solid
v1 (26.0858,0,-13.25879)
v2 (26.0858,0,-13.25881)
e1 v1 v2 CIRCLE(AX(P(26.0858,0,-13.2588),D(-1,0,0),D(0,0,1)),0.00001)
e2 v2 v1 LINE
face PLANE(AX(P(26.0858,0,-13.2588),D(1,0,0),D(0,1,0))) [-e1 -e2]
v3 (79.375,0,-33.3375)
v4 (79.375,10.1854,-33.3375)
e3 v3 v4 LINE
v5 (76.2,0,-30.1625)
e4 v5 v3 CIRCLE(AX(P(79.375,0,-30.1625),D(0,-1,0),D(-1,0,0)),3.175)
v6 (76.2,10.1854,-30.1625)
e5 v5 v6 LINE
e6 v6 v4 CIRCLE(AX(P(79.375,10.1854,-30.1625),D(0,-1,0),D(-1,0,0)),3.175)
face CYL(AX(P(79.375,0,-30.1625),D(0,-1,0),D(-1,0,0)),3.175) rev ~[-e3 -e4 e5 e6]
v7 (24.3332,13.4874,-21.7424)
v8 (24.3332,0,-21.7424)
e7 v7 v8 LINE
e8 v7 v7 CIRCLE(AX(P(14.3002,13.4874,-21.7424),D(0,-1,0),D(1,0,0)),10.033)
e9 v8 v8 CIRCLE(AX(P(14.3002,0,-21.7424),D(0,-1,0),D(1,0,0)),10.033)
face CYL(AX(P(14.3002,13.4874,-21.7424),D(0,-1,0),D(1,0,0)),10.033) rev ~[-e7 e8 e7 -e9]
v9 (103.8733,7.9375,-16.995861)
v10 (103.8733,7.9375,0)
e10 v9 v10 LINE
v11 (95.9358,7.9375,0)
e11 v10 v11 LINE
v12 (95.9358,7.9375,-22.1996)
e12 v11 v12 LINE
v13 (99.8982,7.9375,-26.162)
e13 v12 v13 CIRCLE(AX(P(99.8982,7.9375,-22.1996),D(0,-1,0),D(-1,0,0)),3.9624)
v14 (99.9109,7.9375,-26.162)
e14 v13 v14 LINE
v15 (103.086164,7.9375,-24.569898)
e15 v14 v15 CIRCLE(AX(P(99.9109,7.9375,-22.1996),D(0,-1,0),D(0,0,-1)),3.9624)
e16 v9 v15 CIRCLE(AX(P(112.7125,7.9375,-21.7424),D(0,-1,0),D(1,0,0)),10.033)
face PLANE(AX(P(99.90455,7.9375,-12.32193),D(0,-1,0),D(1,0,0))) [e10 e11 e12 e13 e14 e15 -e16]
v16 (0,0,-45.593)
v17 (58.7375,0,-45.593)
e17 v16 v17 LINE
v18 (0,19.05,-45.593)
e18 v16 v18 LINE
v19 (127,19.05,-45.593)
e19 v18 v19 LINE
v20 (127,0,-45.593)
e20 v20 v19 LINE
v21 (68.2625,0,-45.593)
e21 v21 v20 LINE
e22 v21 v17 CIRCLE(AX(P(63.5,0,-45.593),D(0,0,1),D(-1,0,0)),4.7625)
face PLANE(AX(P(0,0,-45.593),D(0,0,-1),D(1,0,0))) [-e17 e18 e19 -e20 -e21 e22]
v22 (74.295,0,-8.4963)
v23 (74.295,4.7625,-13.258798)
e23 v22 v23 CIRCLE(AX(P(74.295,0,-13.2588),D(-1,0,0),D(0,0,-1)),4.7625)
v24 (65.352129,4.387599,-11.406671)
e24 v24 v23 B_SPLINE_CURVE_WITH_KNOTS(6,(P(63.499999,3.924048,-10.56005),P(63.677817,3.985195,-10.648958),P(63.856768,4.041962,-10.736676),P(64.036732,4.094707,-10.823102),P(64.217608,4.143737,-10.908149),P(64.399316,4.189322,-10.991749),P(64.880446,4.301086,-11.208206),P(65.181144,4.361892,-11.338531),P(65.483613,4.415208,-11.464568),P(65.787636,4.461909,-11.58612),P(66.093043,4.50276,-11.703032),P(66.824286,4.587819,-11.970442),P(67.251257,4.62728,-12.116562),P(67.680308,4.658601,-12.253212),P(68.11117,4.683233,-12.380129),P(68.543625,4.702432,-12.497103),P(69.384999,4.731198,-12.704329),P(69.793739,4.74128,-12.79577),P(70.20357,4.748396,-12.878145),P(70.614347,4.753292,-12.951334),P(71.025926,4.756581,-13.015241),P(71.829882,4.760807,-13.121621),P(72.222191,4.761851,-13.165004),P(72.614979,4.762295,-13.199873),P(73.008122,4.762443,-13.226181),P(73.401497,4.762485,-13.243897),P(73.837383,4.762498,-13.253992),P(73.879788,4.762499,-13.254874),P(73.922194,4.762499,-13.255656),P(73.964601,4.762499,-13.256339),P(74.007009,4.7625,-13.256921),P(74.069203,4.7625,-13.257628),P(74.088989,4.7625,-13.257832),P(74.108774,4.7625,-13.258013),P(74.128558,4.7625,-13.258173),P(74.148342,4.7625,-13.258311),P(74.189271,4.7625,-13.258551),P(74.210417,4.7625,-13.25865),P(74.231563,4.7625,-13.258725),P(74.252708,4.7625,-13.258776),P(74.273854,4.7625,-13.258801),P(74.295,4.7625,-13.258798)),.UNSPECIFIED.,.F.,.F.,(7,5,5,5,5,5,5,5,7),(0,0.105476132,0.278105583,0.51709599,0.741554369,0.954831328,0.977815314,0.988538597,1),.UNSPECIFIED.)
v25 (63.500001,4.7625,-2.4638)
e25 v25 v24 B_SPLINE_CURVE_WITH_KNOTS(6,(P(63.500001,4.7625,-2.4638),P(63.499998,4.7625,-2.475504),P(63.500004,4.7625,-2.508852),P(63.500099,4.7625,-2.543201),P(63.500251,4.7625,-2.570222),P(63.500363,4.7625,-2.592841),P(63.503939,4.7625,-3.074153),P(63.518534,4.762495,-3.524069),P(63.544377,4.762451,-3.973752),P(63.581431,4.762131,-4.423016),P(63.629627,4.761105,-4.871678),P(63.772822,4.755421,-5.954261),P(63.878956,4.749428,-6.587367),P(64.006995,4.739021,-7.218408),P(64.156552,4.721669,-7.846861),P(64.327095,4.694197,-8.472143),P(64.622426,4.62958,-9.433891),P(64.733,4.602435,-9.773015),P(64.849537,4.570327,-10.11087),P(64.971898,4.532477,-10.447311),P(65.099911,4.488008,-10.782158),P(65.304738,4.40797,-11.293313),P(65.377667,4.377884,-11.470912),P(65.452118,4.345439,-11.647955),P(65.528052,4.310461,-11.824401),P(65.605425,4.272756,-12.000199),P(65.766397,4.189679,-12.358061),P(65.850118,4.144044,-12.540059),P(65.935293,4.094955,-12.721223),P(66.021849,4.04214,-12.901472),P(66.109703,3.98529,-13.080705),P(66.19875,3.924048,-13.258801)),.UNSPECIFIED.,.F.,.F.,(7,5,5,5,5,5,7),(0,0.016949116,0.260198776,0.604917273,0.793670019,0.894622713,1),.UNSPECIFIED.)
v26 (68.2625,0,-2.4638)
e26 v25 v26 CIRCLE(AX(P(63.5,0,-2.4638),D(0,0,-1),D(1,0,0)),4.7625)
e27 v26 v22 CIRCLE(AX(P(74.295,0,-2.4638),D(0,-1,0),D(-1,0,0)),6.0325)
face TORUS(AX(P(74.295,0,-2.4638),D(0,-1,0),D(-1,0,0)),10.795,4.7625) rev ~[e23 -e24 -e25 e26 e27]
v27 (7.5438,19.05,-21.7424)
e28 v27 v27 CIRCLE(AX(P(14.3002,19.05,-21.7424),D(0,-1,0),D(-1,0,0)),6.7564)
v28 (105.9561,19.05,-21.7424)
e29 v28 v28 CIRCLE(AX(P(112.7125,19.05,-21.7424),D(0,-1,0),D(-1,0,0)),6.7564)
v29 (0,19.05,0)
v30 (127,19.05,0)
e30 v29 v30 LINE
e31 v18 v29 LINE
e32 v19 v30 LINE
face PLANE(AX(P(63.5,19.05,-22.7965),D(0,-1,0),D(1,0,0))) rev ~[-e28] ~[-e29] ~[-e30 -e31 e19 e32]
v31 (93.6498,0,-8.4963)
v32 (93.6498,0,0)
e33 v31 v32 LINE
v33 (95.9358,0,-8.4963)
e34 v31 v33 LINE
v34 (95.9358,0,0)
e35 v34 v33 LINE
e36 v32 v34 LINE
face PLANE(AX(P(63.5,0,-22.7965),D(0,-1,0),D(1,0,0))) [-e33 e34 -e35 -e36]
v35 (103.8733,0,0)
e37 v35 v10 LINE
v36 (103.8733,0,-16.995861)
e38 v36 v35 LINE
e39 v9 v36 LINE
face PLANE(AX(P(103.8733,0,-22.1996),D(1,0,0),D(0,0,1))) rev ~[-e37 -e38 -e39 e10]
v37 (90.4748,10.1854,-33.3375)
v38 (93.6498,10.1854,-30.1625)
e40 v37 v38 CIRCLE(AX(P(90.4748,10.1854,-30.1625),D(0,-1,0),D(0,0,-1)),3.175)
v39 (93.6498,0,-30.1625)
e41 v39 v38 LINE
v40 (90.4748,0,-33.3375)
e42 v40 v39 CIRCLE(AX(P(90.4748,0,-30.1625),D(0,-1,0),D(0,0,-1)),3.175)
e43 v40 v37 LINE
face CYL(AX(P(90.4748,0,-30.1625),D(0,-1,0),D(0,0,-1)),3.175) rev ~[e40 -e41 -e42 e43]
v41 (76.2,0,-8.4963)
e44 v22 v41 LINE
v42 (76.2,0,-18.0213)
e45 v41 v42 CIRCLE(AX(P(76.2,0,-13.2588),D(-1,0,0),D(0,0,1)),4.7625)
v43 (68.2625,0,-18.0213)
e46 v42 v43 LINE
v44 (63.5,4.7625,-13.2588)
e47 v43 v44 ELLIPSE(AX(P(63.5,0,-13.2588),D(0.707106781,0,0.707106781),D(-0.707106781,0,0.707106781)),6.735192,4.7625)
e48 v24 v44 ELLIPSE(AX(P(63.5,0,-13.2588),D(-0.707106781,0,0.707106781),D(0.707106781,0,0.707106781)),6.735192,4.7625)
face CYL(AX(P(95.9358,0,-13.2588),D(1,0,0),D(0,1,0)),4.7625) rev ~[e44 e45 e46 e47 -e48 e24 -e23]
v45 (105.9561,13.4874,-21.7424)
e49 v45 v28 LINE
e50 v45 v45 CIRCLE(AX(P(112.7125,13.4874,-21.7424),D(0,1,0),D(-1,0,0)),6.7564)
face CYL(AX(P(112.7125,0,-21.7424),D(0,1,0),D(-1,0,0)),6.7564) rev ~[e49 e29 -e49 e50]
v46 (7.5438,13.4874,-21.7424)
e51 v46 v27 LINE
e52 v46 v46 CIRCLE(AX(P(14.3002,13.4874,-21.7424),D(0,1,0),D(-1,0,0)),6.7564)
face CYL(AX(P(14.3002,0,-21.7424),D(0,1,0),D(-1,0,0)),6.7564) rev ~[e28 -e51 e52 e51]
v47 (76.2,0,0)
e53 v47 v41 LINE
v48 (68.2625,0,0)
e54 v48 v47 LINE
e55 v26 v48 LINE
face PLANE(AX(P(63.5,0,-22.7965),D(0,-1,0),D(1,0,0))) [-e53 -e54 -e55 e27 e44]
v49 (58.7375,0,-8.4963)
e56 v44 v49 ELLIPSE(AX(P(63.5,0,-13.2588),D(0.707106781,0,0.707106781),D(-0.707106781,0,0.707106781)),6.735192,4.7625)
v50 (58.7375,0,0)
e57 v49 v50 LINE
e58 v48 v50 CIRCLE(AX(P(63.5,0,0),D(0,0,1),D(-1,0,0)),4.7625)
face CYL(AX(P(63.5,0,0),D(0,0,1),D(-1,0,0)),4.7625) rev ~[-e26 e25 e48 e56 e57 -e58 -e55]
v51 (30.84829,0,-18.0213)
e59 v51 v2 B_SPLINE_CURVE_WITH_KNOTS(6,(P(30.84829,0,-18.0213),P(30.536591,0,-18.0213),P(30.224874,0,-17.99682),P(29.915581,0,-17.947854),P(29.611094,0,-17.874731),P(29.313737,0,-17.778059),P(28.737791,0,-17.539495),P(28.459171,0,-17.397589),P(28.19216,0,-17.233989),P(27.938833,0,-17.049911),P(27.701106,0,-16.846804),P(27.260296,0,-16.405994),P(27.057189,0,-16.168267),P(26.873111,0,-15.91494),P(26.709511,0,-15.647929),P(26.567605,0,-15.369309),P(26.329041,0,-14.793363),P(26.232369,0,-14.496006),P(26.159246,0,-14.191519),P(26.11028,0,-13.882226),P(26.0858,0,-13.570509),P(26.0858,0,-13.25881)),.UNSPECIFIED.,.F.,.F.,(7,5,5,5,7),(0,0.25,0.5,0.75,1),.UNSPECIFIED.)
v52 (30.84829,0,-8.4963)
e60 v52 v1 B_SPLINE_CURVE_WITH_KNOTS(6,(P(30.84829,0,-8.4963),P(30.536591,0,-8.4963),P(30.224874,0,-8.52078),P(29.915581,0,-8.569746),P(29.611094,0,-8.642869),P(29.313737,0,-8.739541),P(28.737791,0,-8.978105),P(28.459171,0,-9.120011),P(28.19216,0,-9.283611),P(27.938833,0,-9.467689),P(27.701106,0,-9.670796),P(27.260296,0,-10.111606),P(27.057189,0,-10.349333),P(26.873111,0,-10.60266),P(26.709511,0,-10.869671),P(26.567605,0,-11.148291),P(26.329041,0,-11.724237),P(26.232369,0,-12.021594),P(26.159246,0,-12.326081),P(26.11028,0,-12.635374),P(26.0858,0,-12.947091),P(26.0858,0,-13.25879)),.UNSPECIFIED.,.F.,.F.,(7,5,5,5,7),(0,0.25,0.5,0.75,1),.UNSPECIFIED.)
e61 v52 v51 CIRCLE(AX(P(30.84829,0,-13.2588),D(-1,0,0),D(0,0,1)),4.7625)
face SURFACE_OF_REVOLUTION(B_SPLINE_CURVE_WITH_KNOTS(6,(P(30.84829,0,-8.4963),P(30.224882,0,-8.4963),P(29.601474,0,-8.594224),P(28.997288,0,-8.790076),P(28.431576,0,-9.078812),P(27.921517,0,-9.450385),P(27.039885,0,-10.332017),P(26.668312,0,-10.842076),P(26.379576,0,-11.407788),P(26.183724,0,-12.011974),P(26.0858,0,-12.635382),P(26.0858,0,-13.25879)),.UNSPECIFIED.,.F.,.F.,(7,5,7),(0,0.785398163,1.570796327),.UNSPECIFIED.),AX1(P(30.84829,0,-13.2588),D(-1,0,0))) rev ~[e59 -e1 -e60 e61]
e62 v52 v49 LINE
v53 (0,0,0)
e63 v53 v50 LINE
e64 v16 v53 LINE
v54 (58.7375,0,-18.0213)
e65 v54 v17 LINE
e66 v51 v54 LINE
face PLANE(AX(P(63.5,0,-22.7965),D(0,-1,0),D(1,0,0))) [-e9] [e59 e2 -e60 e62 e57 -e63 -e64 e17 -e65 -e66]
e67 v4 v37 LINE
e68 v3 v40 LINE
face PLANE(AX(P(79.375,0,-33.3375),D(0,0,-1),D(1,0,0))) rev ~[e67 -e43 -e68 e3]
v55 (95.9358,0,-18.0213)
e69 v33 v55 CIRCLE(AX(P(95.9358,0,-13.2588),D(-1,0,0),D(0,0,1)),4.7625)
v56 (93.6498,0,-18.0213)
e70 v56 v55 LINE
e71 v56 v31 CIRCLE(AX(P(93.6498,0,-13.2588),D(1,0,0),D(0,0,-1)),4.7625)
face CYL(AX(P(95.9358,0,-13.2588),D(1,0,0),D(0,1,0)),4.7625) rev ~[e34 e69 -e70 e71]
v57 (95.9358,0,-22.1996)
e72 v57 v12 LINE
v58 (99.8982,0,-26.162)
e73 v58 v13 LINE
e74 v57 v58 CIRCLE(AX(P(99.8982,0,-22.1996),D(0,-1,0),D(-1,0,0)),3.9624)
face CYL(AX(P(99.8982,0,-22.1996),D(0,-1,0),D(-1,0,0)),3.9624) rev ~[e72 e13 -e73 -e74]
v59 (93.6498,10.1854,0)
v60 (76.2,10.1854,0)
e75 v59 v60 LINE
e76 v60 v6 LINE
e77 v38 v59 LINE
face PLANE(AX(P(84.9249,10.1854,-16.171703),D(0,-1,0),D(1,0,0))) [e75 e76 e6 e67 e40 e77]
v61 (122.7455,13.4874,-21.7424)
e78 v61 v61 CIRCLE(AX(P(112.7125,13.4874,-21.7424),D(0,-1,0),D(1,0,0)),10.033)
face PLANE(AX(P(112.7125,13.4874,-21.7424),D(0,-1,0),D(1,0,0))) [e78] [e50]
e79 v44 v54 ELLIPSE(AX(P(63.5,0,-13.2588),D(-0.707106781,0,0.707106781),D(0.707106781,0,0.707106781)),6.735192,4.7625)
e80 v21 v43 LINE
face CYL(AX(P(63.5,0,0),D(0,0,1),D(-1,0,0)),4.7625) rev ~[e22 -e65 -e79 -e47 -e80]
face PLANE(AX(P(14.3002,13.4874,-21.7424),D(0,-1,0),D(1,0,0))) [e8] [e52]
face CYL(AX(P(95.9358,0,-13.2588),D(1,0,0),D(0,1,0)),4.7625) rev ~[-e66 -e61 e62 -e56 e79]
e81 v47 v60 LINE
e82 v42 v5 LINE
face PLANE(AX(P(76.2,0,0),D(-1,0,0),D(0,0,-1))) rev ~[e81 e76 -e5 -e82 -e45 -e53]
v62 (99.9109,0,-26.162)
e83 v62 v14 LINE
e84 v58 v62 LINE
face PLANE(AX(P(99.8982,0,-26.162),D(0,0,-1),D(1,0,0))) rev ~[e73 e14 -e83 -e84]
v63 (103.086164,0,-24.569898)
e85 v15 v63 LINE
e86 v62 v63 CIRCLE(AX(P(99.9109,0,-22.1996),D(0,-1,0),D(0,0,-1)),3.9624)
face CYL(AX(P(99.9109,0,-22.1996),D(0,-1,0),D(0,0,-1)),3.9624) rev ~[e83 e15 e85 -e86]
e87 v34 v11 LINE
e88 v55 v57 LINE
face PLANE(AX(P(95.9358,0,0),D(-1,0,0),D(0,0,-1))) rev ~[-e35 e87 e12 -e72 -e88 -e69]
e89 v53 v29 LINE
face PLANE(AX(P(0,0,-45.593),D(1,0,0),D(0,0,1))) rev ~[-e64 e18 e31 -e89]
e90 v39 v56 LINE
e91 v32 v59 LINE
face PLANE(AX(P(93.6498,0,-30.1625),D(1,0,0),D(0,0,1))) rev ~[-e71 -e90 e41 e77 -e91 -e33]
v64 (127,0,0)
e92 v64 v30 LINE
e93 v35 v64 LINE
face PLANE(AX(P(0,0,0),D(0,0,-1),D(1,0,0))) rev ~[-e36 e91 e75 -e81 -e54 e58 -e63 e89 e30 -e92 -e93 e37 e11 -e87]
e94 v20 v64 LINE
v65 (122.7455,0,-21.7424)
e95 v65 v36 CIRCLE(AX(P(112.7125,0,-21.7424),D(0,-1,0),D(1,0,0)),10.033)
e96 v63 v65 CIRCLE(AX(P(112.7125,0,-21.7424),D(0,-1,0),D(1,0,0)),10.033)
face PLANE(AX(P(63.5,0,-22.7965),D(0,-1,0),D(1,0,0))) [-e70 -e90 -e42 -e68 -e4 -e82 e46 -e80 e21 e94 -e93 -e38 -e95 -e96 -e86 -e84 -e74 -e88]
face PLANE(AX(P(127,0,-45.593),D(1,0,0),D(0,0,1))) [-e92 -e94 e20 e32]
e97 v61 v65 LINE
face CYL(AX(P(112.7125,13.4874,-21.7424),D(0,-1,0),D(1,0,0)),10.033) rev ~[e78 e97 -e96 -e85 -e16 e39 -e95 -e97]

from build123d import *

# Parameters (mm, degrees)
F0_W           = 127
F0_H           = 45.593
F1_DEPTH       = 19.05
F3_D           = 13.5128
F3_DEPTH       = 19.05
F3_CBORE_D     = 20.066
F3_CBORE_DEPTH = 13.4874
F3_TIP         = 4.0596546864
F5_DEPTH       = 45.593
F7_DEPTH       = 10.1854
F9_DEPTH       = 7.9375
F10_R          = 4.7625
F11_DEPTH      = 69.85
F12_R          = 4.76249
F4_R           = 4.7625


# Not quite as in the source:
# - a fillet or chamfer is up to 0.001 mm smaller than in the source, because OpenCascade refuses the exact size


with BuildPart() as f1:
    # F0 (on Front) → F1 (new body)
    with BuildSketch(Plane.XZ):
        with Locations((63.5, -22.7965)):
            Rectangle(F0_W, F0_H)
    extrude(amount=-F1_DEPTH)

    # F3
    with Locations(Plane.XZ):
        with Locations((14.3002, -21.7424), (112.7125, -21.7424)):
            CounterBoreHole(F3_D / 2, F3_CBORE_D / 2, F3_CBORE_DEPTH, depth=F3_DEPTH)
            with Locations((0, 0, -(F3_DEPTH + F3_TIP / 2))):  # 118° drill point
                Cone(0, F3_D / 2, F3_TIP, mode=Mode.SUBTRACT)

    # F4 (on face) → F5 (cut)
    with BuildSketch(Plane.XY):
        with BuildLine():
            Line((58.7375, 0), (68.2625, 0))
            ThreePointArc((68.2625, 0), (63.5, 4.7625), (58.7375, 0))
        make_face()
        with BuildLine():
            ThreePointArc((58.7375, 0), (63.5, -4.7625), (68.2625, 0))
            Line((68.2625, 0), (58.7375, 0))
        make_face()
    extrude(amount=-F5_DEPTH, mode=Mode.SUBTRACT)

    # F6 (on face) → F7 (cut)
    with BuildSketch(Plane.XZ):
        with BuildLine():
            Line((93.6498, 0), (76.2, 0))
            Line((76.2, 0), (76.2, -30.1625))
            ThreePointArc((76.2, -30.1625), (77.1299359697, -32.4075640303), (79.375, -33.3375))
            Line((79.375, -33.3375), (90.4748, -33.3375))
            ThreePointArc((90.4748, -33.3375), (92.7198640303, -32.4075640303), (93.6498, -30.1625))
            Line((93.6498, -30.1625), (93.6498, 0))
        make_face()
    extrude(amount=-F7_DEPTH, mode=Mode.SUBTRACT)

    # F8 (on Front) → F9 (cut)
    with BuildSketch(Plane.XZ):
        with BuildLine():
            Line((103.8733, 0), (95.9358, 0))
            Line((95.9358, 0), (95.9358, -22.1996))
            ThreePointArc((95.9358, -22.1996), (97.0963600902, -25.0014399098), (99.8982, -26.162))
            Line((99.8982, -26.162), (99.9109, -26.162))
            ThreePointArc((99.9109, -26.162), (102.7127399098, -25.0014399098), (103.8733, -22.1996))
            Line((103.8733, -22.1996), (103.8733, 0))
        make_face()
    extrude(amount=-F9_DEPTH, mode=Mode.SUBTRACT)

    # F10 (on face) → F11 (cut)
    with BuildSketch(Plane.YZ.offset(95.9358)):
        with Locations((0, -13.2588)):
            Circle(F10_R)
    extrude(amount=-F11_DEPTH, mode=Mode.SUBTRACT)

    # F12 (radius 4.7625 in the source; OpenCascade refuses exactly that, so slightly less here)
    f12_edges = [f1.edges().sort_by_distance(p)[0] for p in [
        (26.0858, 4.7625, -13.2588),
    ]]
    fillet(f12_edges, radius=F12_R)

    # F14: sweep along a path in F13
    with BuildLine(Plane.XZ) as f14_path:
        Line((63.5, 0), (63.5, -2.4638))
        ThreePointArc((63.5, -2.4638), (66.6617822971, -10.0970177029), (74.295, -13.2588))
        Line((74.295, -13.2588), (77.6987022404, -13.2588))
    # F4 (on face) → F14 (sweep, cut)
    with BuildSketch(Plane.XY):
        with Locations((63.5, 0)):
            Circle(F4_R)
    sweep(path=f14_path.line, mode=Mode.SUBTRACT)


solid = f1.part
